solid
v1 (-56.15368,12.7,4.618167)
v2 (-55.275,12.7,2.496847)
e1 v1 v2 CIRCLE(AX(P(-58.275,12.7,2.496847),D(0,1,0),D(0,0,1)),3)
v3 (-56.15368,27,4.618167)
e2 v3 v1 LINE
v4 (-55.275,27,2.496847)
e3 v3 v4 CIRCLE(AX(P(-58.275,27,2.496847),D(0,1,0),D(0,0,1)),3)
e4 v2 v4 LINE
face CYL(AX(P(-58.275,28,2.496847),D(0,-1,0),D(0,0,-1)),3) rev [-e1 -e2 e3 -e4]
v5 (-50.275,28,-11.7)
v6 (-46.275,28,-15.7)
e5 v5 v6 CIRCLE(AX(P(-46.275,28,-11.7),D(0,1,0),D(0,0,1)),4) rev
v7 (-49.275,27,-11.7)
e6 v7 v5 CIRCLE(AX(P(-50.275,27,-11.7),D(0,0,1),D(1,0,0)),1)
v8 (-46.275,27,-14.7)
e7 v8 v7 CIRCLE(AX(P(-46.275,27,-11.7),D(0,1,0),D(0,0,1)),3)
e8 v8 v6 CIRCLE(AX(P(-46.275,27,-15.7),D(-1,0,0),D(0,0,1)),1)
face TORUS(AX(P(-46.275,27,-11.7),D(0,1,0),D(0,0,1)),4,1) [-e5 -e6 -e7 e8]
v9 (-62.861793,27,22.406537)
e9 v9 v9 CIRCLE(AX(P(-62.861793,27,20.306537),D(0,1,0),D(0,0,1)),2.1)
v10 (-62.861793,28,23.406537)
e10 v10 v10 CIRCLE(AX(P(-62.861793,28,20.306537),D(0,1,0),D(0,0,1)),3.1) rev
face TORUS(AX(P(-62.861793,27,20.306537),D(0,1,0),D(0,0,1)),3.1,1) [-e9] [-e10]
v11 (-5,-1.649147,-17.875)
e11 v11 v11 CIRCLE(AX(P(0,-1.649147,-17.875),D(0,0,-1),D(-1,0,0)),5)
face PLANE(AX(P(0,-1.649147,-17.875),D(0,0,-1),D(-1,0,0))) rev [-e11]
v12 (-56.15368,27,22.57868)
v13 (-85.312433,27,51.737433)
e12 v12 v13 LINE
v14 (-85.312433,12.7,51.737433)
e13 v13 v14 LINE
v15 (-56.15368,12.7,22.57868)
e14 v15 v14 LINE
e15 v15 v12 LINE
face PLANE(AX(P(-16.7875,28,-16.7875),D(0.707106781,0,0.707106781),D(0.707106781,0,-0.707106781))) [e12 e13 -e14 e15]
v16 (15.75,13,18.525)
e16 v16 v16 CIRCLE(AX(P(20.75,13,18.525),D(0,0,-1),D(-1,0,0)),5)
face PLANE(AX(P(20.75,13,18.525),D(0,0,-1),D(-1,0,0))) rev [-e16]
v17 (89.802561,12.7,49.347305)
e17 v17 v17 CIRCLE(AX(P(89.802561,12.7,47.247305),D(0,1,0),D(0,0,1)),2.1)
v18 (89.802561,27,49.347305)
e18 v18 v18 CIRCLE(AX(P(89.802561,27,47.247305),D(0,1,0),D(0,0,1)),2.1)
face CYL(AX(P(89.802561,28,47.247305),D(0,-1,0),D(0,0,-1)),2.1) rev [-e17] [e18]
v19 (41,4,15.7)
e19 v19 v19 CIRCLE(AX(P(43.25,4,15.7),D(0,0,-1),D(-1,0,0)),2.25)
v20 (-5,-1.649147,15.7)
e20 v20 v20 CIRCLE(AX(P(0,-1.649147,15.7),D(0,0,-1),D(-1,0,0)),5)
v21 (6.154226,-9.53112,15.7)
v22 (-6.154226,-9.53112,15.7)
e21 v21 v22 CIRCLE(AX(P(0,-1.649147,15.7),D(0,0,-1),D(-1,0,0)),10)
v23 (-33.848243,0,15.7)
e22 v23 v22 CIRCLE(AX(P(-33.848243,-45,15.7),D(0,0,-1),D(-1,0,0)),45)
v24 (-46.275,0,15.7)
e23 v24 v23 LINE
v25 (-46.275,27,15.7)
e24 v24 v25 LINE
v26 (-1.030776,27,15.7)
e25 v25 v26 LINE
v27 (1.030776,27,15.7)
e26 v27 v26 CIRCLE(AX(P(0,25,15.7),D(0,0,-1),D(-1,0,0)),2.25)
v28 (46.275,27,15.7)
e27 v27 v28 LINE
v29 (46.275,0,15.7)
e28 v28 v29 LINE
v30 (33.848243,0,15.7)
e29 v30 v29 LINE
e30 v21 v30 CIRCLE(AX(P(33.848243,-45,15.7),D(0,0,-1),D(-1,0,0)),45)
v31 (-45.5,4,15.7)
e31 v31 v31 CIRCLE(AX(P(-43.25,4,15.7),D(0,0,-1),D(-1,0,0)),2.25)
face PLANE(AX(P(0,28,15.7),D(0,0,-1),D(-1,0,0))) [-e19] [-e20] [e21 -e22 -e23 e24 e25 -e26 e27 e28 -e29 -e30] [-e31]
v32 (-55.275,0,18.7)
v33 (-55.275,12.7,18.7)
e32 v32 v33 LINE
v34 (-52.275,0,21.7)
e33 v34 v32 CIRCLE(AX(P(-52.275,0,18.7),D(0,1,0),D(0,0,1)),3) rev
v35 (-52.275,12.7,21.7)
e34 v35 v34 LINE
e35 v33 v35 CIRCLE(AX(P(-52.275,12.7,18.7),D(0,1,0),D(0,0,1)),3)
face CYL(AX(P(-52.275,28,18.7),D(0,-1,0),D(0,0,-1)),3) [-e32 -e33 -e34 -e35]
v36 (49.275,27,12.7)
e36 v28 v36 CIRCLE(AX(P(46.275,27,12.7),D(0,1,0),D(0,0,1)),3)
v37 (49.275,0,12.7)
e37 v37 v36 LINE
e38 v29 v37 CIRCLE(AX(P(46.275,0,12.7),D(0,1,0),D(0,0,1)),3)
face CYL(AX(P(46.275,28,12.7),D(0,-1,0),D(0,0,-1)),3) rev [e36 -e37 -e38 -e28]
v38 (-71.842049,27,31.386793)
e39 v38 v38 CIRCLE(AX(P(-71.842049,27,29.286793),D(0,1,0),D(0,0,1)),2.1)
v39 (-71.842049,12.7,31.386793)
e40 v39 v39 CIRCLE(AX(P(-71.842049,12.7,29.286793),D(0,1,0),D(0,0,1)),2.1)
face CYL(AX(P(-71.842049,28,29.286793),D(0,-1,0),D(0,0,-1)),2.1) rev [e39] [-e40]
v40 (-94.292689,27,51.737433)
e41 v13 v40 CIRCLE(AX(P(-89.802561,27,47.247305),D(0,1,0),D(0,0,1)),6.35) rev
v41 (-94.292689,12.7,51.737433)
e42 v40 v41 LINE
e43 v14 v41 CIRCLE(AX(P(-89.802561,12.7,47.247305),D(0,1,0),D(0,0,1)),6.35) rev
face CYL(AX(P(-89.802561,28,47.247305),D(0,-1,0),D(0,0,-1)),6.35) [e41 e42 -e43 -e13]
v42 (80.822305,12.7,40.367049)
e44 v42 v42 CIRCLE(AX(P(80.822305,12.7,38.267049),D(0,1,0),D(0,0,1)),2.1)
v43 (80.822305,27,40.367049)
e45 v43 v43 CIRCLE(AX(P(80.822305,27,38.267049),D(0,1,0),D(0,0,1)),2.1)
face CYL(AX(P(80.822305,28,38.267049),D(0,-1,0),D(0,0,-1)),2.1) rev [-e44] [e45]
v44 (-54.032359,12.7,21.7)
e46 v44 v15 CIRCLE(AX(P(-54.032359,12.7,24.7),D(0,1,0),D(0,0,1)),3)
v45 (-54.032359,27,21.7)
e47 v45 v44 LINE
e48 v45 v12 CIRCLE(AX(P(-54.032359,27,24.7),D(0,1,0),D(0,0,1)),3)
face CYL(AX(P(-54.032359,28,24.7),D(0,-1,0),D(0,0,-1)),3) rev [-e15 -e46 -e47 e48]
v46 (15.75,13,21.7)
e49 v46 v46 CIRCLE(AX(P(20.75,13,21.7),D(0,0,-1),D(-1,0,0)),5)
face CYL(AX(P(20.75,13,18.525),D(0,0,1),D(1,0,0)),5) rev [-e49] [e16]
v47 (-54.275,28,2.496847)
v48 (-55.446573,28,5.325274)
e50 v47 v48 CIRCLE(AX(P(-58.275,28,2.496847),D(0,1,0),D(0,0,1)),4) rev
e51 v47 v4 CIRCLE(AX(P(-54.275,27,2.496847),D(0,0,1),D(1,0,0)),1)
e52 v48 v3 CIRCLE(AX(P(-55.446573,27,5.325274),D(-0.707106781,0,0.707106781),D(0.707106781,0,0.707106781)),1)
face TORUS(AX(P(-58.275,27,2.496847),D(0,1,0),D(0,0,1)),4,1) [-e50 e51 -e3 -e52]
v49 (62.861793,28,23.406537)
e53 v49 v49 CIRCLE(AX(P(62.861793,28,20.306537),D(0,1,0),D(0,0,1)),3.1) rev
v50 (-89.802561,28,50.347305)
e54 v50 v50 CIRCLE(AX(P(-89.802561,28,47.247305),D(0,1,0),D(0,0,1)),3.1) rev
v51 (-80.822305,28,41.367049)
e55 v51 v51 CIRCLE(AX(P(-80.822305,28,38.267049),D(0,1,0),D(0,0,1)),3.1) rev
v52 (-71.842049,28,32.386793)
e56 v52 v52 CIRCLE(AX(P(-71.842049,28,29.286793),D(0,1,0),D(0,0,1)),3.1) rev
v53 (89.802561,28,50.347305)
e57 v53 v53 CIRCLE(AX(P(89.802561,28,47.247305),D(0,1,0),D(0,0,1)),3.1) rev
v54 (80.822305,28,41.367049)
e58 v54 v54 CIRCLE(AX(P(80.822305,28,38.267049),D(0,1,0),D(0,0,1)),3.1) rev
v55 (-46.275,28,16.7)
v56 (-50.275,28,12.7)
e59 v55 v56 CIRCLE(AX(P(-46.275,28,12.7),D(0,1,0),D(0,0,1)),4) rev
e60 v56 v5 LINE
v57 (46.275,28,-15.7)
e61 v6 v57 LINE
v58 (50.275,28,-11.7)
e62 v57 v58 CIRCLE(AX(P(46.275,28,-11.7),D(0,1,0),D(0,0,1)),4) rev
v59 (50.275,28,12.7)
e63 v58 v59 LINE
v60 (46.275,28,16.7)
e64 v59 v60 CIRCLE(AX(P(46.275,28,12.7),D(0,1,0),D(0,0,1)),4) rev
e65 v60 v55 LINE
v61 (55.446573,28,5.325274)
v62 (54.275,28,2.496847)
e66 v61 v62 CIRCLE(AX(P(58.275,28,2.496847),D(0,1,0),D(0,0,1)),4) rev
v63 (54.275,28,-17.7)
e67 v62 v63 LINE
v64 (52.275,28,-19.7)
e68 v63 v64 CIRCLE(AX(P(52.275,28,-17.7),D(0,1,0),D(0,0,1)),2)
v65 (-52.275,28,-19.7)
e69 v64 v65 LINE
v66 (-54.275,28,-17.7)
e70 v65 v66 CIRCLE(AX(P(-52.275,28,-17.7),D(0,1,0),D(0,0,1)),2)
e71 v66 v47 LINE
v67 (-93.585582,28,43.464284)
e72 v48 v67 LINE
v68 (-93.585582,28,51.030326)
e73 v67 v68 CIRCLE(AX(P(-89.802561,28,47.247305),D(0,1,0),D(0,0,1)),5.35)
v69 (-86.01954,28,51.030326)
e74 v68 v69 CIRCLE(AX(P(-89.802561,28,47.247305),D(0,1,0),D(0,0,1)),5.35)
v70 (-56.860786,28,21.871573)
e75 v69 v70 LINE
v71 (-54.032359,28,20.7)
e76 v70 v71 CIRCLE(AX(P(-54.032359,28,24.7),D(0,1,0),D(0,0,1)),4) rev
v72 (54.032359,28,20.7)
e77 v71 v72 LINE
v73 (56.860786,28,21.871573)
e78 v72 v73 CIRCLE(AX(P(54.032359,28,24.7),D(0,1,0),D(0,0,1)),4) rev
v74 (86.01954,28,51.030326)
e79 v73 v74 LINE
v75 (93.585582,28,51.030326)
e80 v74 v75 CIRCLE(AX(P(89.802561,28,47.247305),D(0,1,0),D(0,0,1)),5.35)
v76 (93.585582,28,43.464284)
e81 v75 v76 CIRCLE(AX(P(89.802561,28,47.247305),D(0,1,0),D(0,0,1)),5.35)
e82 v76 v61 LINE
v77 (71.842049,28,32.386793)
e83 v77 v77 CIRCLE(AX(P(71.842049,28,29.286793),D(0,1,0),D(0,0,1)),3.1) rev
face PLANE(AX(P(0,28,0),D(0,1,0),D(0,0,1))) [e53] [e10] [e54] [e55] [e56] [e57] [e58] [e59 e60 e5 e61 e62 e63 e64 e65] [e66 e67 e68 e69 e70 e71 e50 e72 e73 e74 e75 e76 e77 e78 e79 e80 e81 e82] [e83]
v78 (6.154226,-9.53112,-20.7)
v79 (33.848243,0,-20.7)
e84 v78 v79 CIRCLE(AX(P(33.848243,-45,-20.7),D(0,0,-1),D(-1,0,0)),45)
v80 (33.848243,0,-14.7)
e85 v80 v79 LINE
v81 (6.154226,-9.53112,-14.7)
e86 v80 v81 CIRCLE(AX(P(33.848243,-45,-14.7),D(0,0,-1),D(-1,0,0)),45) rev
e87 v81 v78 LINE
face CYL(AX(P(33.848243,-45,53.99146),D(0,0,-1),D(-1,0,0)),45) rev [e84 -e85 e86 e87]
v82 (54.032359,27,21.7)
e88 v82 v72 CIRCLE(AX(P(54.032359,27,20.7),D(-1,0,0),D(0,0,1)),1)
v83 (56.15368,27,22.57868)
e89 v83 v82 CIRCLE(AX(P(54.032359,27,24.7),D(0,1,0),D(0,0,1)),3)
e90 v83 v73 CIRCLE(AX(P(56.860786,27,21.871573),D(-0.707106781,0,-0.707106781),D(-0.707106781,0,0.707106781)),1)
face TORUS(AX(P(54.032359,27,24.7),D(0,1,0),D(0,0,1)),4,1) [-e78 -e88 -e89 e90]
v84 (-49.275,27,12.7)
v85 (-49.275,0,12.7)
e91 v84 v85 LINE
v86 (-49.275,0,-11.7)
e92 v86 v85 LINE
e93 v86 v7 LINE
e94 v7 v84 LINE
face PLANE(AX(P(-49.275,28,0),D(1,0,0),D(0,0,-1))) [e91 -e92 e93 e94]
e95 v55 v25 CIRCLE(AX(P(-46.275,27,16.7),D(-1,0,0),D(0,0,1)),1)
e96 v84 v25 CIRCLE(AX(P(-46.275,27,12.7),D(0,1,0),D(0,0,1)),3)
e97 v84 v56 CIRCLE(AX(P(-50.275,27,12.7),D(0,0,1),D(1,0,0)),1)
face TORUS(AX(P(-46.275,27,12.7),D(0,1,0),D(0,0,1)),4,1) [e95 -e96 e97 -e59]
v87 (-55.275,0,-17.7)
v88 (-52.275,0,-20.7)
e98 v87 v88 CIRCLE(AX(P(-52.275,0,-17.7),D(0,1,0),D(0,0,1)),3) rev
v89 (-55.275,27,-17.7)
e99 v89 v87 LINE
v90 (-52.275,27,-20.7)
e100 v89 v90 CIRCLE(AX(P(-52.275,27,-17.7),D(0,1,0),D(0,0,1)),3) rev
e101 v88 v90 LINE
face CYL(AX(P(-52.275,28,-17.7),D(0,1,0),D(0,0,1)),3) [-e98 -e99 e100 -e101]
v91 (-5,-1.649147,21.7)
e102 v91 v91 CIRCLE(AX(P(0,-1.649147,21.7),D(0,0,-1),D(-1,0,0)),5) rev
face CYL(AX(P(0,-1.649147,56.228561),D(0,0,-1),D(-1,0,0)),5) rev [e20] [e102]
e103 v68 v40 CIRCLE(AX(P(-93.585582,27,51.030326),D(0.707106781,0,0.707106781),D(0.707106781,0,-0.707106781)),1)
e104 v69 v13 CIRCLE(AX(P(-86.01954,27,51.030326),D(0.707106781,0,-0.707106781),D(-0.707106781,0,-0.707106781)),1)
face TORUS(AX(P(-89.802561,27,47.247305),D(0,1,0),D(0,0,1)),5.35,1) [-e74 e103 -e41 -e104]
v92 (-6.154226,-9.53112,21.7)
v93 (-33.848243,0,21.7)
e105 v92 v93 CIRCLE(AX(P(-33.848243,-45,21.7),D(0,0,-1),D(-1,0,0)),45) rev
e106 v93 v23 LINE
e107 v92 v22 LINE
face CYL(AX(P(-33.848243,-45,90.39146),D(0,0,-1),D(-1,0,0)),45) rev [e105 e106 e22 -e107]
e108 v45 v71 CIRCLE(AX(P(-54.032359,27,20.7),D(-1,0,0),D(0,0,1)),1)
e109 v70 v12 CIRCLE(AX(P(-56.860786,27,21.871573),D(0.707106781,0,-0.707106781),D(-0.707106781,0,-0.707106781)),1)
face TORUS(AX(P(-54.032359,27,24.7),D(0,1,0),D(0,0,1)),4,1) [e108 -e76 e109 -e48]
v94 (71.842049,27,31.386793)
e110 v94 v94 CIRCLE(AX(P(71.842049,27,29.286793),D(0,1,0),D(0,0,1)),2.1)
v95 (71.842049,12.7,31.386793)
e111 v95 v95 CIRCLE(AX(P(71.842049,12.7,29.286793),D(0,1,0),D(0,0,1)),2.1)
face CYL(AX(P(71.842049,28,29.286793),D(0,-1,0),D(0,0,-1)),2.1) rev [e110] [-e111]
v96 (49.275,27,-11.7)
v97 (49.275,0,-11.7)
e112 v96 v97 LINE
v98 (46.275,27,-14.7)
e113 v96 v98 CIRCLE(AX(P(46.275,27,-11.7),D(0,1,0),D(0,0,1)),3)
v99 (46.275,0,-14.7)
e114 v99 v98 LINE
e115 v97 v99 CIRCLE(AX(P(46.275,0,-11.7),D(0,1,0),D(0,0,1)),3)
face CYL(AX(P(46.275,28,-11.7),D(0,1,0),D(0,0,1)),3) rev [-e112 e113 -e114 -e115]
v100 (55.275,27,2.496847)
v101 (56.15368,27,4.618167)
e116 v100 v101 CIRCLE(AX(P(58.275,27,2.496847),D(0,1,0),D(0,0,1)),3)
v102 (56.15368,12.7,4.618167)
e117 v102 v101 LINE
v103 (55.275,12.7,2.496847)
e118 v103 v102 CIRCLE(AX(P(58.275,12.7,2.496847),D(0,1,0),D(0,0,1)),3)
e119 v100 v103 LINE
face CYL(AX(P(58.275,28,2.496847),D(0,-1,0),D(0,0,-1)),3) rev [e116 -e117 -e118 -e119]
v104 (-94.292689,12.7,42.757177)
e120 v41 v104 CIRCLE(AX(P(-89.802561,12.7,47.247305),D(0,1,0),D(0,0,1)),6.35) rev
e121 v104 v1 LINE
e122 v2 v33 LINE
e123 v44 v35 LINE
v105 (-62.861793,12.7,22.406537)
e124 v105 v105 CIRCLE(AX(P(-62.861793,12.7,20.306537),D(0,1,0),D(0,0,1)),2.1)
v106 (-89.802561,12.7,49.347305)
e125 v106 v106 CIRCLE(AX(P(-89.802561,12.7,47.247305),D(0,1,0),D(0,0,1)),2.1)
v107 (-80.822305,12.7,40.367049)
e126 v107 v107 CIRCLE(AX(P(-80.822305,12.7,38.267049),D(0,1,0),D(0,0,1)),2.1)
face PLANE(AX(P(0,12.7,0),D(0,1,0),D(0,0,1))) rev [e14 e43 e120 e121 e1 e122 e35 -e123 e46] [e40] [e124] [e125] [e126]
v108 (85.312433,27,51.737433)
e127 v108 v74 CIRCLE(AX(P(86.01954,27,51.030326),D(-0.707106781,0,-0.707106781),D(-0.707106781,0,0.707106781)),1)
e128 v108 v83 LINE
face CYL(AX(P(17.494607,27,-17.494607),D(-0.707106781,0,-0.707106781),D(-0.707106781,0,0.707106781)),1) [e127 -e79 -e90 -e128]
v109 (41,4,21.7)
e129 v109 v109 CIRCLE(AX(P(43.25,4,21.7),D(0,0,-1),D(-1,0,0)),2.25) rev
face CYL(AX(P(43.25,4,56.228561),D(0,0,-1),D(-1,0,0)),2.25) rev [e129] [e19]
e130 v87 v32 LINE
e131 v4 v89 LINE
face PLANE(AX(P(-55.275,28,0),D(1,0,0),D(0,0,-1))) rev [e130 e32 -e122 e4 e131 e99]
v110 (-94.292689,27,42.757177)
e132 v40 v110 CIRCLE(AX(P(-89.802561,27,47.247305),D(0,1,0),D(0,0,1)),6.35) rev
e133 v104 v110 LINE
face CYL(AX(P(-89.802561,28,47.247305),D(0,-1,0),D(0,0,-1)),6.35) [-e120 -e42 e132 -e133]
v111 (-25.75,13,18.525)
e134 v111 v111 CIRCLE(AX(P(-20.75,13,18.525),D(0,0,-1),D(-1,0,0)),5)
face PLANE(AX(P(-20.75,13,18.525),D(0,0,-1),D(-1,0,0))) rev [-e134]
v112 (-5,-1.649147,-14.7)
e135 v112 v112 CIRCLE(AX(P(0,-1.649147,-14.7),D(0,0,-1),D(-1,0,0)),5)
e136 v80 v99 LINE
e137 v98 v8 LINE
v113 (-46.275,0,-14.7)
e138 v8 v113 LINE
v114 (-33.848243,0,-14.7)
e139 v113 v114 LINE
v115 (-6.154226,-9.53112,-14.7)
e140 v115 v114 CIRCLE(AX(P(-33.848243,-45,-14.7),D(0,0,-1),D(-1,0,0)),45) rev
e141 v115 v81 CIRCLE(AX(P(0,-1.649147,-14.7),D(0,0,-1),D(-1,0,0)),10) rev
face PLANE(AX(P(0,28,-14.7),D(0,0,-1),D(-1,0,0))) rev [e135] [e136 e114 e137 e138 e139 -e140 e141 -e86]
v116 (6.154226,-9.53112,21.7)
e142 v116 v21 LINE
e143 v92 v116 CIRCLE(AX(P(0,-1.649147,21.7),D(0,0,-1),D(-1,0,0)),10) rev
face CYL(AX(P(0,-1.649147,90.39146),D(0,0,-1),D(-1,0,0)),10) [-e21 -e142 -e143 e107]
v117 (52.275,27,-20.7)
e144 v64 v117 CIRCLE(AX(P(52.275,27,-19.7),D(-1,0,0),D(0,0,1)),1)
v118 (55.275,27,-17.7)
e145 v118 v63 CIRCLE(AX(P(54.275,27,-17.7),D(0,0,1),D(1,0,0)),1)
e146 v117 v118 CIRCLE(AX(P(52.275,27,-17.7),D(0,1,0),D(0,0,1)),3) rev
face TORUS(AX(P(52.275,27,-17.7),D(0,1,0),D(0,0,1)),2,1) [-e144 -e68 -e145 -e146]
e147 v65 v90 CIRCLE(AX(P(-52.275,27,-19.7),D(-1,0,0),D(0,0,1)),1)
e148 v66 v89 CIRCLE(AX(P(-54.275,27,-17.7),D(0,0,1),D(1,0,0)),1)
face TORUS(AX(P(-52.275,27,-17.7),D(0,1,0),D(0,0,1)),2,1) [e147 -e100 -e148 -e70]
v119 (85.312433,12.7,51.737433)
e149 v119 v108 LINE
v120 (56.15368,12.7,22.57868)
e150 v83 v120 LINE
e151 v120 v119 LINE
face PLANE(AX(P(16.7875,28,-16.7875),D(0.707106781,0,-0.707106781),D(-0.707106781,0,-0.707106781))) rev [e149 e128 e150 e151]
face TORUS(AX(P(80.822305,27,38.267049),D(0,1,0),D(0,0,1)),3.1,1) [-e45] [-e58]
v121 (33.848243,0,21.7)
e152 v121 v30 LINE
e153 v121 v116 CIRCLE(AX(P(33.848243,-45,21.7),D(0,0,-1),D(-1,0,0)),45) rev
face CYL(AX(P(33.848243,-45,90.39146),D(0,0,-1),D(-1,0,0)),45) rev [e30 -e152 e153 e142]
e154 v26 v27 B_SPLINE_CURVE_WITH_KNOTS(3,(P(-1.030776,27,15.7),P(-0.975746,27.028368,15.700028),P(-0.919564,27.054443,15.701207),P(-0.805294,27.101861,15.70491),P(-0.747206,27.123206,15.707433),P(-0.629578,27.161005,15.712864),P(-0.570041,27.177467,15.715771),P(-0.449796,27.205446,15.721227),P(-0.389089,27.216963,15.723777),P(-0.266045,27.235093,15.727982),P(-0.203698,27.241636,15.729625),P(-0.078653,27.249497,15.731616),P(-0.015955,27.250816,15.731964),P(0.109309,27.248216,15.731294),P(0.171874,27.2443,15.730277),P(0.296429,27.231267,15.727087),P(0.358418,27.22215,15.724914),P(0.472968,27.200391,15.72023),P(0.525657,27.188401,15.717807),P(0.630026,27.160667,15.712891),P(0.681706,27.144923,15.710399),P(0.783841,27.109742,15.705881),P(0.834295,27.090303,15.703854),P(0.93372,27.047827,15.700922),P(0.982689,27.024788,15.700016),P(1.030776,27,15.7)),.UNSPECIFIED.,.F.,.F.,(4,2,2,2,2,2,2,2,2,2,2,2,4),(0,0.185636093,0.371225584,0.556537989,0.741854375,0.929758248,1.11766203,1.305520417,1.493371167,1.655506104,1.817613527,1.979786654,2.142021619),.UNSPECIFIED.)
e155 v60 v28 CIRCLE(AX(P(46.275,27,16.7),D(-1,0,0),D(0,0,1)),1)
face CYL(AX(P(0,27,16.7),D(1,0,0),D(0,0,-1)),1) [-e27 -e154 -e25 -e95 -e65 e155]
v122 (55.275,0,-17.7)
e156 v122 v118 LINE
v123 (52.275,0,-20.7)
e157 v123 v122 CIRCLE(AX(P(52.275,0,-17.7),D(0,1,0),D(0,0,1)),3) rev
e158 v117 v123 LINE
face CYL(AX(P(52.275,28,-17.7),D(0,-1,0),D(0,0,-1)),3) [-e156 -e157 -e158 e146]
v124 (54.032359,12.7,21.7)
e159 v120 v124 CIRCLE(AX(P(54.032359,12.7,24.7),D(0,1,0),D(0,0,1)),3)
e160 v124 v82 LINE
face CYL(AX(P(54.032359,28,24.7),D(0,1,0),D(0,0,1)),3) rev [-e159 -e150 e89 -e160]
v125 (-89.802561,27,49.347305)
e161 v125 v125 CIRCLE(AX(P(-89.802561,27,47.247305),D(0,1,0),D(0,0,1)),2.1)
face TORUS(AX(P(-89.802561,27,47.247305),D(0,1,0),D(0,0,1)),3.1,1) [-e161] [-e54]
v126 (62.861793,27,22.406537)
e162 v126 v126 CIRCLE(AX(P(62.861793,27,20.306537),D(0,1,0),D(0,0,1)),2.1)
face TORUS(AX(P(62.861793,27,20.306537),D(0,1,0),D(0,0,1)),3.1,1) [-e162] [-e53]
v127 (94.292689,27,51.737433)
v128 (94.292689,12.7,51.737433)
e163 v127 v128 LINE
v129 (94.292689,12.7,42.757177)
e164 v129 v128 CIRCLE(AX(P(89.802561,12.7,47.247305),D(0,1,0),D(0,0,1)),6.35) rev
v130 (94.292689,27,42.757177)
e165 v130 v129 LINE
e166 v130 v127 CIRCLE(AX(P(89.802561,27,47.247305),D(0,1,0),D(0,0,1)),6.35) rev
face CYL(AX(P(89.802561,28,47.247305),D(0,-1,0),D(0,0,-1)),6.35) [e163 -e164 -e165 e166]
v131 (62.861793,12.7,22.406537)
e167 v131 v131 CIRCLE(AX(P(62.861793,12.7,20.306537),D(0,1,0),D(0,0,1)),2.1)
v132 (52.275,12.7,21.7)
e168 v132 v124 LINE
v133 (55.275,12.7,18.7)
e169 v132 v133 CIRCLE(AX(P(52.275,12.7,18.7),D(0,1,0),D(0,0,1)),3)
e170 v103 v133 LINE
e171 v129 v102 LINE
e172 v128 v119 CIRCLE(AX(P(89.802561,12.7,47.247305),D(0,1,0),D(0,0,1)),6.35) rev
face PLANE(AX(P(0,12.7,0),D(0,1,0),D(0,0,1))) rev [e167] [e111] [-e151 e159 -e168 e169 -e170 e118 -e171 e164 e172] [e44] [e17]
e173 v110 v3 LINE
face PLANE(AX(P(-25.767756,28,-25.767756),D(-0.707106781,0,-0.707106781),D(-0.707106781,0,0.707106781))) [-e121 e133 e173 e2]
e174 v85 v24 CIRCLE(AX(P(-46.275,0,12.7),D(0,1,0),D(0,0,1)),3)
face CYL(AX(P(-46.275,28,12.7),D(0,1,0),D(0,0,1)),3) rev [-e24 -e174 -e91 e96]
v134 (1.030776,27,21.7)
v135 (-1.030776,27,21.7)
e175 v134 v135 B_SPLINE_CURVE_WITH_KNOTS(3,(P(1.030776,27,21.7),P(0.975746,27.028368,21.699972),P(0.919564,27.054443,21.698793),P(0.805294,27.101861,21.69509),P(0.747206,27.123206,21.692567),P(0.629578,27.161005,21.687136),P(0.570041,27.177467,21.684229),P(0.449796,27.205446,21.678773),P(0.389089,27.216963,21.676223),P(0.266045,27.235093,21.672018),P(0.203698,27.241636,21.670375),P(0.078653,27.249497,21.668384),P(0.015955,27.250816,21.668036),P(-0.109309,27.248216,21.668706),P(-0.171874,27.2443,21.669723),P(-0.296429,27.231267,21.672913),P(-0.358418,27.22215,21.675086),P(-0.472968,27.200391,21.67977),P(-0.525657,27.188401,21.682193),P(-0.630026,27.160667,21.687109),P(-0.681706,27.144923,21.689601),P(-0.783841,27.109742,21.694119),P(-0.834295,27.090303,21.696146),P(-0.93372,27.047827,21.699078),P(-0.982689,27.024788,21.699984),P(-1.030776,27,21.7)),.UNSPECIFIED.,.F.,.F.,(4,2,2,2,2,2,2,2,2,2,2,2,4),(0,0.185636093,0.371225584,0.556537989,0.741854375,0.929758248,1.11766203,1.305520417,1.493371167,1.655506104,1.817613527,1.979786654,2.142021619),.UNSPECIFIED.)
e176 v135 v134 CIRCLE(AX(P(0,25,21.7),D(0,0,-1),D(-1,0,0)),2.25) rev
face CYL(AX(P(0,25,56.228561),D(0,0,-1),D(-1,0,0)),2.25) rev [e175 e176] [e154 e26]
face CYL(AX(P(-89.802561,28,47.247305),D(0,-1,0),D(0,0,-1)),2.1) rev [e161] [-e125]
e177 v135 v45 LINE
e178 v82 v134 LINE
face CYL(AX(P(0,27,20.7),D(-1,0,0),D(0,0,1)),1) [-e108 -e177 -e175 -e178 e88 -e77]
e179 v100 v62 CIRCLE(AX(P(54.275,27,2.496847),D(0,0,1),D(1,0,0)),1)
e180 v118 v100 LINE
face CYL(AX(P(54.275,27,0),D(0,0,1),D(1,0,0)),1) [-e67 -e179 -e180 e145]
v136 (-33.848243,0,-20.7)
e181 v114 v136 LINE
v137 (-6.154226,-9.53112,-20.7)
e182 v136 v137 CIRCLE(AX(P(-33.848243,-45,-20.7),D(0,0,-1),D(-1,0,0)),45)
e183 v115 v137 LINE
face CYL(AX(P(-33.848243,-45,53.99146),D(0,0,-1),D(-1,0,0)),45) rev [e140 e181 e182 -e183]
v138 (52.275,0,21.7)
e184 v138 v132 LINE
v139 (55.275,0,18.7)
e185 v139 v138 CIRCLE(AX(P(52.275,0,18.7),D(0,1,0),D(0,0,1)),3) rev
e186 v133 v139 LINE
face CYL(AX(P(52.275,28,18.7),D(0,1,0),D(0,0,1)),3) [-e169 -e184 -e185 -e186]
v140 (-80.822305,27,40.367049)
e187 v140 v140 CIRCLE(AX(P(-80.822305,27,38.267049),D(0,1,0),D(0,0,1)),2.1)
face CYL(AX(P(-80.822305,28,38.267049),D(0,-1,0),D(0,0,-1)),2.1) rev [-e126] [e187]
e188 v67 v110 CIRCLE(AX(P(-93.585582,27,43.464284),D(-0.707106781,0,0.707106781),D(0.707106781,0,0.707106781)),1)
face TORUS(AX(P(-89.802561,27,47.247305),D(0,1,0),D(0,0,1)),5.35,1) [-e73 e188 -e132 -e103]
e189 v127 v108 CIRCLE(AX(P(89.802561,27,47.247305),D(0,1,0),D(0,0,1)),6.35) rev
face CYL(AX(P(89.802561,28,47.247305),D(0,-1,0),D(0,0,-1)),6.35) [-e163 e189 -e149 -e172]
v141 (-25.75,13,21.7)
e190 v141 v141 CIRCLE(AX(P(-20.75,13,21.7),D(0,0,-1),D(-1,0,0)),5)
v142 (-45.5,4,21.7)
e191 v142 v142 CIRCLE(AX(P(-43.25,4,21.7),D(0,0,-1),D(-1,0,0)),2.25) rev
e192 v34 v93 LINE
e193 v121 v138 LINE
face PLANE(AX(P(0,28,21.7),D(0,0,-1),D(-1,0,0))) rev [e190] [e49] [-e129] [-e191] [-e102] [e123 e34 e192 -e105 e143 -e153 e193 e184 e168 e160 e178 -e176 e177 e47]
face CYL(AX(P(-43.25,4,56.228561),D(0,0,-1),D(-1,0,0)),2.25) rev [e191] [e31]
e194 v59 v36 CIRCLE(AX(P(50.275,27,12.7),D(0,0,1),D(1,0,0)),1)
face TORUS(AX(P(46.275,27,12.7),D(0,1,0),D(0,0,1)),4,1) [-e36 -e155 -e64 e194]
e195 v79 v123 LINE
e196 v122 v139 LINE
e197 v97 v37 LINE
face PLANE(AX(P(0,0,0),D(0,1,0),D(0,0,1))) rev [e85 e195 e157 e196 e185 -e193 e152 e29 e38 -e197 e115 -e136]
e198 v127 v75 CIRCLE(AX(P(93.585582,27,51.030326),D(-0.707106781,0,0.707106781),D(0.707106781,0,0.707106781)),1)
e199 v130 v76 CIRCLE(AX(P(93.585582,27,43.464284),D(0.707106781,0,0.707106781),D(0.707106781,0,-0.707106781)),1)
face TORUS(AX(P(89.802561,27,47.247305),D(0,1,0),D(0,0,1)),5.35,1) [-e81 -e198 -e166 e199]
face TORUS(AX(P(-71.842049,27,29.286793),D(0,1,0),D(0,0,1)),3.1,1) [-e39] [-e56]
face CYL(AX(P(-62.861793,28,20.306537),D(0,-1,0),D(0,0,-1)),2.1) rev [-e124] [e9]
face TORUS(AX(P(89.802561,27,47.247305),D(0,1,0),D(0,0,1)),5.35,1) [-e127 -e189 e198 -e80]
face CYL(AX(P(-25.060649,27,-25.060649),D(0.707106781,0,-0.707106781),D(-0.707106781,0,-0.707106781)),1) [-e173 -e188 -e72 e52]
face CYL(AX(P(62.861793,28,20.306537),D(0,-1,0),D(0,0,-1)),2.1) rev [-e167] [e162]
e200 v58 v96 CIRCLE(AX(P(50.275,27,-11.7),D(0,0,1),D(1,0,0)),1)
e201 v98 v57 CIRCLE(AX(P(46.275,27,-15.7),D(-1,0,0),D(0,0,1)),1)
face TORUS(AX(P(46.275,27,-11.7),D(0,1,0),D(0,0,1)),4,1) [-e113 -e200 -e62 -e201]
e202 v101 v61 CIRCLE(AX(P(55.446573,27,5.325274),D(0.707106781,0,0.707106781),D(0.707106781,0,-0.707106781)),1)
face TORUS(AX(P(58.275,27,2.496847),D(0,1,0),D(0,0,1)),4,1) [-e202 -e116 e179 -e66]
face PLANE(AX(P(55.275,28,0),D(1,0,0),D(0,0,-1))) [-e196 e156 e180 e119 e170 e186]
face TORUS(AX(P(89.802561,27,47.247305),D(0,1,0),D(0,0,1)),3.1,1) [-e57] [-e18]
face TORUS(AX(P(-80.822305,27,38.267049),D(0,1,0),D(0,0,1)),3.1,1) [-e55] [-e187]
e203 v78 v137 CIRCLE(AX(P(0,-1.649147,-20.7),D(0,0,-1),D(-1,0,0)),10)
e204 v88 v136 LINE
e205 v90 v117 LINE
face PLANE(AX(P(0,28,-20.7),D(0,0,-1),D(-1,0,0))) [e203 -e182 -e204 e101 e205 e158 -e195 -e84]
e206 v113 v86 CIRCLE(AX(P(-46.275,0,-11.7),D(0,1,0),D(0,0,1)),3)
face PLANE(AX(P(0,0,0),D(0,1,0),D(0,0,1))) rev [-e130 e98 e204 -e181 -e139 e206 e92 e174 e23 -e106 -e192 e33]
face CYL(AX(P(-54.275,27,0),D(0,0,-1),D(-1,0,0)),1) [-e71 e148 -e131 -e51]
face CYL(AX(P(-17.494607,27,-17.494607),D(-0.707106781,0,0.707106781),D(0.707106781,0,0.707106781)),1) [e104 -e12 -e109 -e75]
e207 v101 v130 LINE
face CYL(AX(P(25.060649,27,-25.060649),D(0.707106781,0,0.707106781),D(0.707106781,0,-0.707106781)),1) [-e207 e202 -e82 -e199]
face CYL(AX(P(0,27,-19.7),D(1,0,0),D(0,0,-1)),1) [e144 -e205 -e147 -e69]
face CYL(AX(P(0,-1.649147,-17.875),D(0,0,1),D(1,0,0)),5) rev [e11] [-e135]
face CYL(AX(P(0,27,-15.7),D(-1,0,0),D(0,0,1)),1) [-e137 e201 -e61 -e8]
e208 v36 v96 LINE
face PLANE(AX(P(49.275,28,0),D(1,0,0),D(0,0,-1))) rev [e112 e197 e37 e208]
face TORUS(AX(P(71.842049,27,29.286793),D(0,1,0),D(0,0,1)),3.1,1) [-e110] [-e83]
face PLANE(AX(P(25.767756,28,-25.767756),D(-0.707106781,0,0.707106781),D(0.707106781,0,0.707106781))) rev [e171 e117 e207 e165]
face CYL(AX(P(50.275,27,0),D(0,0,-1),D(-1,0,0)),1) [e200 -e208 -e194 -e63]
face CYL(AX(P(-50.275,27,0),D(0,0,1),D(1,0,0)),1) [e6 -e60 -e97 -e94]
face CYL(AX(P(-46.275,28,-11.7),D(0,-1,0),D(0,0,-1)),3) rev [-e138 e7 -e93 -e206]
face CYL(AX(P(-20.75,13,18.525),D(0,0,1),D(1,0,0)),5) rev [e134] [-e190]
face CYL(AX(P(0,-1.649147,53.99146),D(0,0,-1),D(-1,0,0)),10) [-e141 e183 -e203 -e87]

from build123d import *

# Parameters (mm, degrees)
SKETCH2_R           = 2.1
SKETCH2_W           = 98.55
SKETCH2_H           = 30.4
BOSS_EXTRUDE1_DEPTH = 28
CUT_EXTRUDE1_START  = -42.4
SKETCH3_R           = 2.25
CUT_EXTRUDE1_DEPTH  = 6
BOSS_EXTRUDE2_DEPTH = 6
BOSS_EXTRUDE3_START = -42.4
BOSS_EXTRUDE3_DEPTH = 6
CUT_EXTRUDE3_START  = -6
CUT_EXTRUDE3_DEPTH  = 3.175
CUT_EXTRUDE4_START  = -42.4
CUT_EXTRUDE4_DEPTH  = 6
FILLET2_R           = 6.35
CUT_EXTRUDE5_START  = -42.4
SKETCH4_7_R         = 5
CUT_EXTRUDE5_DEPTH  = 3.175
SKETCH2_4_R         = 2.1
CUT_EXTRUDE6_DEPTH  = 12.7
FILLET1_R           = 3
FILLET3_R           = 3
FILLET4_R           = 1


# Some blends are built 0.0001 mm under size
with BuildPart() as part:
    # Sketch2 → Boss-Extrude1 (new body)
    with BuildSketch(Plane(origin=(0, 0, 0), x_dir=(1, 0, 0), z_dir=(0, 1, 0))):
        Polygon((-89.802561211, -56.227561211), (-55.275, -21.7), (55.275, -21.7), (89.802561211, -56.227561211), (98.782817332, -47.24730509), (55.275, -3.739487758), (55.275, 20.7), (-55.275, 20.7), (-55.275, -3.739487758), (-98.782817332, -47.24730509), align=None)
        with Locations(Location((-89.802561211, -47.24730509, 0), (0, 0, 270))):
            Circle(SKETCH2_R, mode=Mode.SUBTRACT)
        with Locations(Location((-80.82230509, -38.267048969, 0), (0, 0, 270))):
            Circle(SKETCH2_R, mode=Mode.SUBTRACT)
        with Locations(Location((-71.842048969, -29.286792847, 0), (0, 0, 270))):
            Circle(SKETCH2_R, mode=Mode.SUBTRACT)
        with Locations(Location((-62.861792847, -20.306536726, 0), (0, 0, 270))):
            Circle(SKETCH2_R, mode=Mode.SUBTRACT)
        with Locations((0, -0.5)):
            Rectangle(SKETCH2_W, SKETCH2_H, mode=Mode.SUBTRACT)
        with Locations(Location((62.861792847, -20.306536726, 0), (0, 0, 270))):
            Circle(SKETCH2_R, mode=Mode.SUBTRACT)
        with Locations(Location((89.802561211, -47.24730509, 0), (0, 0, 270))):
            Circle(SKETCH2_R, mode=Mode.SUBTRACT)
        with Locations(Location((80.82230509, -38.267048969, 0), (0, 0, 270))):
            Circle(SKETCH2_R, mode=Mode.SUBTRACT)
        with Locations(Location((71.842048969, -29.286792847, 0), (0, 0, 270))):
            Circle(SKETCH2_R, mode=Mode.SUBTRACT)
    extrude(amount=BOSS_EXTRUDE1_DEPTH)

    # Sketch3 → Cut-Extrude1 (cut)
    with BuildSketch(Plane(origin=(0, 0, -20.7), x_dir=(-1, 0, 0), z_dir=(0, 0, -1)).offset(CUT_EXTRUDE1_START)):
        with Locations((-43.25, 4)):
            Circle(SKETCH3_R)
        with Locations((0, 25)):
            Circle(SKETCH3_R)
        with Locations((43.25, 4)):
            Circle(SKETCH3_R)
    extrude(amount=CUT_EXTRUDE1_DEPTH, mode=Mode.SUBTRACT)

    # Sketch4 → Boss-Extrude2 (add)
    with BuildSketch(Plane(origin=(0, 0, -20.7), x_dir=(-1, 0, 0), z_dir=(0, 0, -1))):
        with BuildLine():
            ThreePointArc((6.154225479, -9.531120391), (19.204123936, -2.44944429), (33.84824251, 0))
            Line((33.84824251, 0), (-33.848242566, 0))
            ThreePointArc((-33.848242566, 0), (-19.204124104, -2.449444233), (-6.154225714, -9.531120208))
            ThreePointArc((-6.154225714, -9.531120208), (-1.49e-07, -11.649146733), (6.154225479, -9.531120391))
        make_face()
    extrude(amount=-BOSS_EXTRUDE2_DEPTH)

    # Sketch4<3> → Boss-Extrude3 (add)
    with BuildSketch(Plane(origin=(0, 0, -20.7), x_dir=(-1, 0, 0), z_dir=(0, 0, -1)).offset(BOSS_EXTRUDE3_START)):
        with BuildLine():
            ThreePointArc((6.154225479, -9.531120391), (19.204123936, -2.44944429), (33.84824251, 0))
            Line((33.84824251, 0), (-33.848242566, 0))
            ThreePointArc((-33.848242566, 0), (-19.204124104, -2.449444233), (-6.154225714, -9.531120208))
            ThreePointArc((-6.154225714, -9.531120208), (-1.49e-07, -11.649146733), (6.154225479, -9.531120391))
        make_face()
    extrude(amount=BOSS_EXTRUDE3_DEPTH)

    # Sketch4<5> → Cut-Extrude3 (cut)
    with BuildSketch(Plane(origin=(0, 0, -20.7), x_dir=(-1, 0, 0), z_dir=(0, 0, -1)).offset(CUT_EXTRUDE3_START)):
        with BuildLine():
            ThreePointArc((5, -1.649146733), (4.929554458, -0.812789844), (4.720202861, 0))
            Line((4.720202861, 0), (-4.720202861, 0))
            ThreePointArc((-4.720202861, 0), (-0.836356889, -6.578701191), (5, -1.649146733))
        make_face()
        with BuildLine():
            Line((-4.720202861, 0), (4.720202861, 0))
            ThreePointArc((4.720202861, 0), (0, 3.350853267), (-4.720202861, 0))
        make_face()
    extrude(amount=CUT_EXTRUDE3_DEPTH, mode=Mode.SUBTRACT)

    # Sketch4<6> → Cut-Extrude4 (cut)
    with BuildSketch(Plane(origin=(0, 0, -20.7), x_dir=(-1, 0, 0), z_dir=(0, 0, -1)).offset(CUT_EXTRUDE4_START)):
        with BuildLine():
            ThreePointArc((5, -1.649146733), (4.929554458, -0.812789844), (4.720202861, 0))
            Line((4.720202861, 0), (-4.720202861, 0))
            ThreePointArc((-4.720202861, 0), (-0.836356889, -6.578701191), (5, -1.649146733))
        make_face()
        with BuildLine():
            Line((-4.720202861, 0), (4.720202861, 0))
            ThreePointArc((4.720202861, 0), (0, 3.350853267), (-4.720202861, 0))
        make_face()
    extrude(amount=CUT_EXTRUDE4_DEPTH, mode=Mode.SUBTRACT)

    # Fillet2
    fillet2_edges = [part.edges().sort_by_distance(p)[0] for p in [
        (98.782817332, 14, 47.24730509),
        (89.802561211, 14, 56.227561211),
        (-89.802561211, 14, 56.227561211),
        (-98.782817332, 14, 47.24730509),
    ]]
    fillet(fillet2_edges, radius=FILLET2_R - 0.0001)  # a hair under: the kernel refuses the full size

    # Sketch4<7> → Cut-Extrude5 (cut)
    with BuildSketch(Plane(origin=(0, 0, -20.7), x_dir=(-1, 0, 0), z_dir=(0, 0, -1)).offset(CUT_EXTRUDE5_START)):
        with Locations((-20.75, 13)):
            Circle(SKETCH4_7_R)
        with Locations((20.75, 13)):
            Circle(SKETCH4_7_R)
    extrude(amount=CUT_EXTRUDE5_DEPTH, mode=Mode.SUBTRACT)

    # Sketch2<4> → Cut-Extrude6 (cut)
    # profile 1 of 2: a face of its own
    with BuildSketch(Plane(origin=(0, 0, 0), x_dir=(1, 0, 0), z_dir=(0, 1, 0))):
        Polygon((-89.802561211, -56.227561211), (-55.275, -21.7), (-55.275, -3.739487758), (-98.782817332, -47.24730509), align=None)
        with Locations(Location((-89.802561211, -47.24730509, 0), (0, 0, 270))):
            Circle(SKETCH2_4_R, mode=Mode.SUBTRACT)
        with Locations(Location((-80.82230509, -38.267048969, 0), (0, 0, 270))):
            Circle(SKETCH2_4_R, mode=Mode.SUBTRACT)
        with Locations(Location((-71.842048969, -29.286792847, 0), (0, 0, 270))):
            Circle(SKETCH2_4_R, mode=Mode.SUBTRACT)
        with Locations(Location((-62.861792847, -20.306536726, 0), (0, 0, 270))):
            Circle(SKETCH2_4_R, mode=Mode.SUBTRACT)
    # profile 2 of 2: a face of its own
    with BuildSketch(Plane(origin=(0, 0, 0), x_dir=(1, 0, 0), z_dir=(0, 1, 0))):
        Polygon((55.275, -3.739487758), (55.275, -21.7), (89.802561211, -56.227561211), (98.782817332, -47.24730509), align=None)
        with Locations(Location((89.802561211, -47.24730509, 0), (0, 0, 270))):
            Circle(SKETCH2_4_R, mode=Mode.SUBTRACT)
        with Locations(Location((80.82230509, -38.267048969, 0), (0, 0, 270))):
            Circle(SKETCH2_4_R, mode=Mode.SUBTRACT)
        with Locations(Location((71.842048969, -29.286792847, 0), (0, 0, 270))):
            Circle(SKETCH2_4_R, mode=Mode.SUBTRACT)
        with Locations(Location((62.861792847, -20.306536726, 0), (0, 0, 270))):
            Circle(SKETCH2_4_R, mode=Mode.SUBTRACT)
    extrude(amount=CUT_EXTRUDE6_DEPTH, mode=Mode.SUBTRACT)

    # Fillet1
    fillet1_edges = [part.edges().sort_by_distance(p)[0] for p in [
        (-55.275, 6.35, 21.7),
        (55.275, 6.35, 21.7),
        (-49.275, 14, -14.7),
        (-49.275, 14, 15.7),
        (49.275, 14, 15.7),
        (49.275, 14, -14.7),
        (-55.275, 14, -20.7),
        (55.275, 14, -20.7),
    ]]
    fillet(fillet1_edges, radius=FILLET1_R)

    # Fillet3
    fillet3_edges = [part.edges().sort_by_distance(p)[0] for p in [
        (55.275, 20.35, 3.739487758),
        (55.275, 20.35, 21.7),
        (-55.275, 20.35, 21.7),
        (-55.275, 20.35, 3.739487758),
    ]]
    fillet(fillet3_edges, radius=FILLET3_R)

    # Fillet4
    # the kernel refuses this fillet: 1 mm, written as the material it takes off along each edge
    with BuildSketch(Plane(origin=(80.82230509, 28, 38.267048969), x_dir=(0, 0, 1), z_dir=(-1, 0, 0))) as fillet4_piece_1:
        with BuildLine():
            CenterArc((2.1 + FILLET4_R, -FILLET4_R), FILLET4_R, 90, 90)
            Line((2.1 + FILLET4_R, 0), (2.1, 0))
            Line((2.1, 0), (2.1, -FILLET4_R))
        make_face()
    revolve(axis=Axis((80.82230509, 28, 38.267048969), (0, 1, 0)), mode=Mode.SUBTRACT)
    with BuildSketch(Plane(origin=(62.861792847, 28, 20.306536726), x_dir=(0, 0, 1), z_dir=(-1, 0, 0))) as fillet4_piece_2:
        with BuildLine():
            CenterArc((2.1 + FILLET4_R, -FILLET4_R), FILLET4_R, 90, 90)
            Line((2.1 + FILLET4_R, 0), (2.1, 0))
            Line((2.1, 0), (2.1, -FILLET4_R))
        make_face()
    revolve(axis=Axis((62.861792847, 28, 20.306536726), (0, 1, 0)), mode=Mode.SUBTRACT)
    with BuildSketch(Plane(origin=(89.802561211, 28, 47.24730509), x_dir=(0, 0, 1), z_dir=(-1, 0, 0))) as fillet4_piece_3:
        with BuildLine():
            CenterArc((2.1 + FILLET4_R, -FILLET4_R), FILLET4_R, 90, 90)
            Line((2.1 + FILLET4_R, 0), (2.1, 0))
            Line((2.1, 0), (2.1, -FILLET4_R))
        make_face()
    revolve(axis=Axis((89.802561211, 28, 47.24730509), (0, 1, 0)), mode=Mode.SUBTRACT)
    with BuildSketch(Plane(origin=(94.292759982, 28, 42.75724774), x_dir=(0, -1, 0), z_dir=(-0.7071067811865493, 0, -0.7071067811865457)), Plane(origin=(-56.153679656, 28, 4.618167414), x_dir=(0, -1, 0), z_dir=(-0.707106781186541, 0, 0.707106781186554))) as fillet4_piece_4:
        with BuildLine():
            CenterArc((FILLET4_R, FILLET4_R), FILLET4_R, 180, 90)
            Line((0, FILLET4_R), (0, 0))
            Line((0, 0), (FILLET4_R, 0))
        make_face()
    extrude(amount=53.936804653, mode=Mode.SUBTRACT)
    with BuildSketch(Plane(origin=(71.842048969, 28, 29.286792847), x_dir=(0, 0, 1), z_dir=(-1, 0, 0))) as fillet4_piece_5:
        with BuildLine():
            CenterArc((2.1 + FILLET4_R, -FILLET4_R), FILLET4_R, 90, 90)
            Line((2.1 + FILLET4_R, 0), (2.1, 0))
            Line((2.1, 0), (2.1, -FILLET4_R))
        make_face()
    revolve(axis=Axis((71.842048969, 28, 29.286792847), (0, 1, 0)), mode=Mode.SUBTRACT)
    with BuildSketch(Plane(origin=(-89.802702632, 28, 47.24730509), x_dir=(-0.7071067811865537, 0, -0.7071067811865414), z_dir=(0.7071067811865414, 0, -0.7071067811865537))) as fillet4_piece_6:
        with BuildLine():
            CenterArc((6.3499 - FILLET4_R, -FILLET4_R), FILLET4_R, 0, 90)
            Line((6.3499 - FILLET4_R, 0), (6.3499, 0))
            Line((6.3499, 0), (6.3499, -FILLET4_R))
        make_face()
    revolve(axis=Axis((-89.802702632, 28, 47.24730509), (0, 1, 0)), revolution_arc=90, mode=Mode.SUBTRACT)
    with BuildSketch(Plane(origin=(-89.802561211, 28, 47.247446511), x_dir=(-0.7071067811865425, 0, 0.7071067811865526), z_dir=(-0.7071067811865526, 0, -0.7071067811865425))) as fillet4_piece_7:
        with BuildLine():
            CenterArc((6.3499 - FILLET4_R, -FILLET4_R), FILLET4_R, 0, 90)
            Line((6.3499 - FILLET4_R, 0), (6.3499, 0))
            Line((6.3499, 0), (6.3499, -FILLET4_R))
        make_face()
    revolve(axis=Axis((-89.802561211, 28, 47.247446511), (0, 1, 0)), revolution_arc=90, mode=Mode.SUBTRACT)
    with BuildSketch(Plane(origin=(89.802561211, 28, 47.247446511), x_dir=(-0.7071067811865469, 0, 0.707106781186548), z_dir=(-0.707106781186548, 0, -0.7071067811865469))) as fillet4_piece_8:
        with BuildLine():
            CenterArc((6.3499 - FILLET4_R, -FILLET4_R), FILLET4_R, 0, 90)
            Line((6.3499 - FILLET4_R, 0), (6.3499, 0))
            Line((6.3499, 0), (6.3499, -FILLET4_R))
        make_face()
    revolve(axis=Axis((89.802561211, 28, 47.247446511), (0, 1, 0)), revolution_arc=90, mode=Mode.SUBTRACT)
    with BuildSketch(Plane(origin=(89.802702632, 28, 47.24730509), x_dir=(0.7071067811865542, 0, 0.7071067811865408), z_dir=(-0.7071067811865408, 0, 0.7071067811865542))) as fillet4_piece_9:
        with BuildLine():
            CenterArc((6.3499 - FILLET4_R, -FILLET4_R), FILLET4_R, 0, 90)
            Line((6.3499 - FILLET4_R, 0), (6.3499, 0))
            Line((6.3499, 0), (6.3499, -FILLET4_R))
        make_face()
    revolve(axis=Axis((89.802702632, 28, 47.24730509), (0, 1, 0)), revolution_arc=90, mode=Mode.SUBTRACT)
    with BuildSketch(Plane(origin=(-55.275, 28, -17.7), x_dir=(0, -1, 0), z_dir=(0, 0, 1)), Plane(origin=(55.275, 28, 2.496847071), x_dir=(0, -1, 0), z_dir=(0, 0, -1))) as fillet4_piece_10:
        with BuildLine():
            CenterArc((FILLET4_R, FILLET4_R), FILLET4_R, 180, 90)
            Line((0, FILLET4_R), (0, 0))
            Line((0, 0), (FILLET4_R, 0))
        make_face()
    extrude(amount=20.196847071, mode=Mode.SUBTRACT)
    with BuildSketch(Plane(origin=(46.275, 28, 15.7), x_dir=(0, -1, 0), z_dir=(-1, 0, 0)), Plane(origin=(-46.275, 28, -14.7), x_dir=(0, -1, 0), z_dir=(1, 0, 0))) as fillet4_piece_11:
        with BuildLine():
            CenterArc((FILLET4_R, FILLET4_R), FILLET4_R, 180, 90)
            Line((0, FILLET4_R), (0, 0))
            Line((0, 0), (FILLET4_R, 0))
        make_face()
    extrude(amount=92.55, mode=Mode.SUBTRACT)
    with BuildSketch(Plane(origin=(49.275, 28, -11.7), x_dir=(0, -1, 0), z_dir=(0, 0, 1)), Plane(origin=(-49.275, 28, 12.7), x_dir=(0, -1, 0), z_dir=(0, 0, -1))) as fillet4_piece_12:
        with BuildLine():
            CenterArc((FILLET4_R, FILLET4_R), FILLET4_R, 180, 90)
            Line((0, FILLET4_R), (0, 0))
            Line((0, 0), (FILLET4_R, 0))
        make_face()
    extrude(amount=24.4, mode=Mode.SUBTRACT)
    with BuildSketch(Plane(origin=(52.275, 28, -20.7), x_dir=(0, -1, 0), z_dir=(-1, 0, 0))) as fillet4_piece_13:
        with BuildLine():
            CenterArc((FILLET4_R, FILLET4_R), FILLET4_R, 180, 90)
            Line((0, FILLET4_R), (0, 0))
            Line((0, 0), (FILLET4_R, 0))
        make_face()
    extrude(amount=104.55, mode=Mode.SUBTRACT)
    with BuildSketch(Plane(origin=(-52.275, 28, -17.7), x_dir=(-1, 0, 0), z_dir=(0, 0, 1))) as fillet4_piece_14:
        with BuildLine():
            CenterArc((3 - FILLET4_R, FILLET4_R), FILLET4_R, 270, 90)
            Line((3 - FILLET4_R, 0), (3, 0))
            Line((3, 0), (3, FILLET4_R))
        make_face()
    revolve(axis=Axis((-52.275, 28, -17.7), (0, -1, 0)), revolution_arc=90, mode=Mode.SUBTRACT)
    with BuildSketch(Plane(origin=(52.275, 28, -17.7), x_dir=(1, 0, 0), z_dir=(0, 0, 1))) as fillet4_piece_15:
        with BuildLine():
            CenterArc((3 - FILLET4_R, -FILLET4_R), FILLET4_R, 0, 90)
            Line((3 - FILLET4_R, 0), (3, 0))
            Line((3, 0), (3, -FILLET4_R))
        make_face()
    revolve(axis=Axis((52.275, 28, -17.7), (0, 1, 0)), revolution_arc=90, mode=Mode.SUBTRACT)
    with BuildSketch(Plane(origin=(46.275, 28, 12.7), x_dir=(1, 0, 0), z_dir=(0, 0, -1))) as fillet4_piece_16:
        with BuildLine():
            CenterArc((3 + FILLET4_R, FILLET4_R), FILLET4_R, 180, 90)
            Line((3 + FILLET4_R, 0), (3, 0))
            Line((3, 0), (3, FILLET4_R))
        make_face()
    revolve(axis=Axis((46.275, 28, 12.7), (0, -1, 0)), revolution_arc=90, mode=Mode.SUBTRACT)
    with BuildSketch(Plane(origin=(-46.275, 28, 12.7), x_dir=(-1, 0, 0), z_dir=(0, 0, -1))) as fillet4_piece_17:
        with BuildLine():
            CenterArc((3 + FILLET4_R, -FILLET4_R), FILLET4_R, 90, 90)
            Line((3 + FILLET4_R, 0), (3, 0))
            Line((3, 0), (3, -FILLET4_R))
        make_face()
    revolve(axis=Axis((-46.275, 28, 12.7), (0, 1, 0)), revolution_arc=90, mode=Mode.SUBTRACT)
    with BuildSketch(Plane(origin=(46.275, 28, -11.7), x_dir=(1, 0, 0), z_dir=(0, 0, 1))) as fillet4_piece_18:
        with BuildLine():
            CenterArc((3 + FILLET4_R, -FILLET4_R), FILLET4_R, 90, 90)
            Line((3 + FILLET4_R, 0), (3, 0))
            Line((3, 0), (3, -FILLET4_R))
        make_face()
    revolve(axis=Axis((46.275, 28, -11.7), (0, 1, 0)), revolution_arc=90, mode=Mode.SUBTRACT)
    with BuildSketch(Plane(origin=(-46.275, 28, -11.7), x_dir=(0, 0, -1), z_dir=(1, 0, 0))) as fillet4_piece_19:
        with BuildLine():
            CenterArc((3 + FILLET4_R, -FILLET4_R), FILLET4_R, 90, 90)
            Line((3 + FILLET4_R, 0), (3, 0))
            Line((3, 0), (3, -FILLET4_R))
        make_face()
    revolve(axis=Axis((-46.275, 28, -11.7), (0, 1, 0)), revolution_arc=90, mode=Mode.SUBTRACT)
    with BuildSketch(Plane(origin=(-54.032359313, 28, 21.7), x_dir=(0, -1, 0), z_dir=(1, 0, 0))) as fillet4_piece_20:
        with BuildLine():
            CenterArc((FILLET4_R, FILLET4_R), FILLET4_R, 180, 90)
            Line((0, FILLET4_R), (0, 0))
            Line((0, 0), (FILLET4_R, 0))
        make_face()
    extrude(amount=108.064718626, mode=Mode.SUBTRACT)
    with BuildSketch(Plane(origin=(-85.312503861, 28, 51.737503861), x_dir=(0, -1, 0), z_dir=(0.7071067811865411, 0, -0.707106781186554)), Plane(origin=(56.153679656, 28, 22.578679656), x_dir=(0, -1, 0), z_dir=(0.7071067811865481, 0, 0.707106781186547))) as fillet4_piece_21:
        with BuildLine():
            CenterArc((FILLET4_R, FILLET4_R), FILLET4_R, 180, 90)
            Line((0, FILLET4_R), (0, 0))
            Line((0, 0), (FILLET4_R, 0))
        make_face()
    extrude(amount=41.236804653, mode=Mode.SUBTRACT)
    with BuildSketch(Plane(origin=(-58.275, 28, 2.496847071), x_dir=(1, 0, 0), z_dir=(0, 0, -1))) as fillet4_piece_22:
        with BuildLine():
            CenterArc((3 + FILLET4_R, FILLET4_R), FILLET4_R, 180, 90)
            Line((3 + FILLET4_R, 0), (3, 0))
            Line((3, 0), (3, FILLET4_R))
        make_face()
    revolve(axis=Axis((-58.275, 28, 2.496847071), (0, -1, 0)), revolution_arc=45, mode=Mode.SUBTRACT)
    with BuildSketch(Plane(origin=(-54.032359313, 28, 24.7), x_dir=(-0.7071067811865552, 0, -0.7071067811865398), z_dir=(-0.7071067811865398, 0, 0.7071067811865552))) as fillet4_piece_23:
        with BuildLine():
            CenterArc((3 + FILLET4_R, FILLET4_R), FILLET4_R, 180, 90)
            Line((3 + FILLET4_R, 0), (3, 0))
            Line((3, 0), (3, FILLET4_R))
        make_face()
    revolve(axis=Axis((-54.032359313, 28, 24.7), (0, -1, 0)), revolution_arc=45, mode=Mode.SUBTRACT)
    with BuildSketch(Plane(origin=(54.032359313, 28, 24.7), x_dir=(0, 0, -1), z_dir=(-1, 0, 0))) as fillet4_piece_24:
        with BuildLine():
            CenterArc((3 + FILLET4_R, FILLET4_R), FILLET4_R, 180, 90)
            Line((3 + FILLET4_R, 0), (3, 0))
            Line((3, 0), (3, FILLET4_R))
        make_face()
    revolve(axis=Axis((54.032359313, 28, 24.7), (0, -1, 0)), revolution_arc=45, mode=Mode.SUBTRACT)
    with BuildSketch(Plane(origin=(58.275, 28, 2.496847071), x_dir=(-1, 0, 0), z_dir=(0, 0, -1))) as fillet4_piece_25:
        with BuildLine():
            CenterArc((3 + FILLET4_R, -FILLET4_R), FILLET4_R, 90, 90)
            Line((3 + FILLET4_R, 0), (3, 0))
            Line((3, 0), (3, -FILLET4_R))
        make_face()
    revolve(axis=Axis((58.275, 28, 2.496847071), (0, 1, 0)), revolution_arc=45, mode=Mode.SUBTRACT)
    with BuildSketch(Plane(origin=(-80.82230509, 28, 38.267048969), x_dir=(0, 0, 1), z_dir=(-1, 0, 0))) as fillet4_piece_26:
        with BuildLine():
            CenterArc((2.1 + FILLET4_R, -FILLET4_R), FILLET4_R, 90, 90)
            Line((2.1 + FILLET4_R, 0), (2.1, 0))
            Line((2.1, 0), (2.1, -FILLET4_R))
        make_face()
    revolve(axis=Axis((-80.82230509, 28, 38.267048969), (0, 1, 0)), mode=Mode.SUBTRACT)
    with BuildSketch(Plane(origin=(-62.861792847, 28, 20.306536726), x_dir=(0, 0, 1), z_dir=(-1, 0, 0))) as fillet4_piece_27:
        with BuildLine():
            CenterArc((2.1 + FILLET4_R, -FILLET4_R), FILLET4_R, 90, 90)
            Line((2.1 + FILLET4_R, 0), (2.1, 0))
            Line((2.1, 0), (2.1, -FILLET4_R))
        make_face()
    revolve(axis=Axis((-62.861792847, 28, 20.306536726), (0, 1, 0)), mode=Mode.SUBTRACT)
    with BuildSketch(Plane(origin=(-71.842048969, 28, 29.286792847), x_dir=(0, 0, 1), z_dir=(-1, 0, 0))) as fillet4_piece_28:
        with BuildLine():
            CenterArc((2.1 + FILLET4_R, -FILLET4_R), FILLET4_R, 90, 90)
            Line((2.1 + FILLET4_R, 0), (2.1, 0))
            Line((2.1, 0), (2.1, -FILLET4_R))
        make_face()
    revolve(axis=Axis((-71.842048969, 28, 29.286792847), (0, 1, 0)), mode=Mode.SUBTRACT)
    with BuildSketch(Plane(origin=(-89.802561211, 28, 47.24730509), x_dir=(0, 0, 1), z_dir=(-1, 0, 0))) as fillet4_piece_29:
        with BuildLine():
            CenterArc((2.1 + FILLET4_R, -FILLET4_R), FILLET4_R, 90, 90)
            Line((2.1 + FILLET4_R, 0), (2.1, 0))
            Line((2.1, 0), (2.1, -FILLET4_R))
        make_face()
    revolve(axis=Axis((-89.802561211, 28, 47.24730509), (0, 1, 0)), mode=Mode.SUBTRACT)
    with BuildSketch(Plane(origin=(94.292618561, 28, 51.737503861), x_dir=(0, -1, 0), z_dir=(0.7071067811865406, 0, -0.7071067811865546)), Plane(origin=(-94.292759982, 28, 51.737362439), x_dir=(0, -1, 0), z_dir=(0.7071067811865535, 0, 0.7071067811865417))) as fillet4_piece_30:
        with BuildLine():
            CenterArc((FILLET4_R, FILLET4_R), FILLET4_R, 180, 90)
            Line((0, FILLET4_R), (0, 0))
            Line((0, 0), (FILLET4_R, 0))
        make_face()
    extrude(amount=0.0002, mode=Mode.SUBTRACT)


solid = part.part
